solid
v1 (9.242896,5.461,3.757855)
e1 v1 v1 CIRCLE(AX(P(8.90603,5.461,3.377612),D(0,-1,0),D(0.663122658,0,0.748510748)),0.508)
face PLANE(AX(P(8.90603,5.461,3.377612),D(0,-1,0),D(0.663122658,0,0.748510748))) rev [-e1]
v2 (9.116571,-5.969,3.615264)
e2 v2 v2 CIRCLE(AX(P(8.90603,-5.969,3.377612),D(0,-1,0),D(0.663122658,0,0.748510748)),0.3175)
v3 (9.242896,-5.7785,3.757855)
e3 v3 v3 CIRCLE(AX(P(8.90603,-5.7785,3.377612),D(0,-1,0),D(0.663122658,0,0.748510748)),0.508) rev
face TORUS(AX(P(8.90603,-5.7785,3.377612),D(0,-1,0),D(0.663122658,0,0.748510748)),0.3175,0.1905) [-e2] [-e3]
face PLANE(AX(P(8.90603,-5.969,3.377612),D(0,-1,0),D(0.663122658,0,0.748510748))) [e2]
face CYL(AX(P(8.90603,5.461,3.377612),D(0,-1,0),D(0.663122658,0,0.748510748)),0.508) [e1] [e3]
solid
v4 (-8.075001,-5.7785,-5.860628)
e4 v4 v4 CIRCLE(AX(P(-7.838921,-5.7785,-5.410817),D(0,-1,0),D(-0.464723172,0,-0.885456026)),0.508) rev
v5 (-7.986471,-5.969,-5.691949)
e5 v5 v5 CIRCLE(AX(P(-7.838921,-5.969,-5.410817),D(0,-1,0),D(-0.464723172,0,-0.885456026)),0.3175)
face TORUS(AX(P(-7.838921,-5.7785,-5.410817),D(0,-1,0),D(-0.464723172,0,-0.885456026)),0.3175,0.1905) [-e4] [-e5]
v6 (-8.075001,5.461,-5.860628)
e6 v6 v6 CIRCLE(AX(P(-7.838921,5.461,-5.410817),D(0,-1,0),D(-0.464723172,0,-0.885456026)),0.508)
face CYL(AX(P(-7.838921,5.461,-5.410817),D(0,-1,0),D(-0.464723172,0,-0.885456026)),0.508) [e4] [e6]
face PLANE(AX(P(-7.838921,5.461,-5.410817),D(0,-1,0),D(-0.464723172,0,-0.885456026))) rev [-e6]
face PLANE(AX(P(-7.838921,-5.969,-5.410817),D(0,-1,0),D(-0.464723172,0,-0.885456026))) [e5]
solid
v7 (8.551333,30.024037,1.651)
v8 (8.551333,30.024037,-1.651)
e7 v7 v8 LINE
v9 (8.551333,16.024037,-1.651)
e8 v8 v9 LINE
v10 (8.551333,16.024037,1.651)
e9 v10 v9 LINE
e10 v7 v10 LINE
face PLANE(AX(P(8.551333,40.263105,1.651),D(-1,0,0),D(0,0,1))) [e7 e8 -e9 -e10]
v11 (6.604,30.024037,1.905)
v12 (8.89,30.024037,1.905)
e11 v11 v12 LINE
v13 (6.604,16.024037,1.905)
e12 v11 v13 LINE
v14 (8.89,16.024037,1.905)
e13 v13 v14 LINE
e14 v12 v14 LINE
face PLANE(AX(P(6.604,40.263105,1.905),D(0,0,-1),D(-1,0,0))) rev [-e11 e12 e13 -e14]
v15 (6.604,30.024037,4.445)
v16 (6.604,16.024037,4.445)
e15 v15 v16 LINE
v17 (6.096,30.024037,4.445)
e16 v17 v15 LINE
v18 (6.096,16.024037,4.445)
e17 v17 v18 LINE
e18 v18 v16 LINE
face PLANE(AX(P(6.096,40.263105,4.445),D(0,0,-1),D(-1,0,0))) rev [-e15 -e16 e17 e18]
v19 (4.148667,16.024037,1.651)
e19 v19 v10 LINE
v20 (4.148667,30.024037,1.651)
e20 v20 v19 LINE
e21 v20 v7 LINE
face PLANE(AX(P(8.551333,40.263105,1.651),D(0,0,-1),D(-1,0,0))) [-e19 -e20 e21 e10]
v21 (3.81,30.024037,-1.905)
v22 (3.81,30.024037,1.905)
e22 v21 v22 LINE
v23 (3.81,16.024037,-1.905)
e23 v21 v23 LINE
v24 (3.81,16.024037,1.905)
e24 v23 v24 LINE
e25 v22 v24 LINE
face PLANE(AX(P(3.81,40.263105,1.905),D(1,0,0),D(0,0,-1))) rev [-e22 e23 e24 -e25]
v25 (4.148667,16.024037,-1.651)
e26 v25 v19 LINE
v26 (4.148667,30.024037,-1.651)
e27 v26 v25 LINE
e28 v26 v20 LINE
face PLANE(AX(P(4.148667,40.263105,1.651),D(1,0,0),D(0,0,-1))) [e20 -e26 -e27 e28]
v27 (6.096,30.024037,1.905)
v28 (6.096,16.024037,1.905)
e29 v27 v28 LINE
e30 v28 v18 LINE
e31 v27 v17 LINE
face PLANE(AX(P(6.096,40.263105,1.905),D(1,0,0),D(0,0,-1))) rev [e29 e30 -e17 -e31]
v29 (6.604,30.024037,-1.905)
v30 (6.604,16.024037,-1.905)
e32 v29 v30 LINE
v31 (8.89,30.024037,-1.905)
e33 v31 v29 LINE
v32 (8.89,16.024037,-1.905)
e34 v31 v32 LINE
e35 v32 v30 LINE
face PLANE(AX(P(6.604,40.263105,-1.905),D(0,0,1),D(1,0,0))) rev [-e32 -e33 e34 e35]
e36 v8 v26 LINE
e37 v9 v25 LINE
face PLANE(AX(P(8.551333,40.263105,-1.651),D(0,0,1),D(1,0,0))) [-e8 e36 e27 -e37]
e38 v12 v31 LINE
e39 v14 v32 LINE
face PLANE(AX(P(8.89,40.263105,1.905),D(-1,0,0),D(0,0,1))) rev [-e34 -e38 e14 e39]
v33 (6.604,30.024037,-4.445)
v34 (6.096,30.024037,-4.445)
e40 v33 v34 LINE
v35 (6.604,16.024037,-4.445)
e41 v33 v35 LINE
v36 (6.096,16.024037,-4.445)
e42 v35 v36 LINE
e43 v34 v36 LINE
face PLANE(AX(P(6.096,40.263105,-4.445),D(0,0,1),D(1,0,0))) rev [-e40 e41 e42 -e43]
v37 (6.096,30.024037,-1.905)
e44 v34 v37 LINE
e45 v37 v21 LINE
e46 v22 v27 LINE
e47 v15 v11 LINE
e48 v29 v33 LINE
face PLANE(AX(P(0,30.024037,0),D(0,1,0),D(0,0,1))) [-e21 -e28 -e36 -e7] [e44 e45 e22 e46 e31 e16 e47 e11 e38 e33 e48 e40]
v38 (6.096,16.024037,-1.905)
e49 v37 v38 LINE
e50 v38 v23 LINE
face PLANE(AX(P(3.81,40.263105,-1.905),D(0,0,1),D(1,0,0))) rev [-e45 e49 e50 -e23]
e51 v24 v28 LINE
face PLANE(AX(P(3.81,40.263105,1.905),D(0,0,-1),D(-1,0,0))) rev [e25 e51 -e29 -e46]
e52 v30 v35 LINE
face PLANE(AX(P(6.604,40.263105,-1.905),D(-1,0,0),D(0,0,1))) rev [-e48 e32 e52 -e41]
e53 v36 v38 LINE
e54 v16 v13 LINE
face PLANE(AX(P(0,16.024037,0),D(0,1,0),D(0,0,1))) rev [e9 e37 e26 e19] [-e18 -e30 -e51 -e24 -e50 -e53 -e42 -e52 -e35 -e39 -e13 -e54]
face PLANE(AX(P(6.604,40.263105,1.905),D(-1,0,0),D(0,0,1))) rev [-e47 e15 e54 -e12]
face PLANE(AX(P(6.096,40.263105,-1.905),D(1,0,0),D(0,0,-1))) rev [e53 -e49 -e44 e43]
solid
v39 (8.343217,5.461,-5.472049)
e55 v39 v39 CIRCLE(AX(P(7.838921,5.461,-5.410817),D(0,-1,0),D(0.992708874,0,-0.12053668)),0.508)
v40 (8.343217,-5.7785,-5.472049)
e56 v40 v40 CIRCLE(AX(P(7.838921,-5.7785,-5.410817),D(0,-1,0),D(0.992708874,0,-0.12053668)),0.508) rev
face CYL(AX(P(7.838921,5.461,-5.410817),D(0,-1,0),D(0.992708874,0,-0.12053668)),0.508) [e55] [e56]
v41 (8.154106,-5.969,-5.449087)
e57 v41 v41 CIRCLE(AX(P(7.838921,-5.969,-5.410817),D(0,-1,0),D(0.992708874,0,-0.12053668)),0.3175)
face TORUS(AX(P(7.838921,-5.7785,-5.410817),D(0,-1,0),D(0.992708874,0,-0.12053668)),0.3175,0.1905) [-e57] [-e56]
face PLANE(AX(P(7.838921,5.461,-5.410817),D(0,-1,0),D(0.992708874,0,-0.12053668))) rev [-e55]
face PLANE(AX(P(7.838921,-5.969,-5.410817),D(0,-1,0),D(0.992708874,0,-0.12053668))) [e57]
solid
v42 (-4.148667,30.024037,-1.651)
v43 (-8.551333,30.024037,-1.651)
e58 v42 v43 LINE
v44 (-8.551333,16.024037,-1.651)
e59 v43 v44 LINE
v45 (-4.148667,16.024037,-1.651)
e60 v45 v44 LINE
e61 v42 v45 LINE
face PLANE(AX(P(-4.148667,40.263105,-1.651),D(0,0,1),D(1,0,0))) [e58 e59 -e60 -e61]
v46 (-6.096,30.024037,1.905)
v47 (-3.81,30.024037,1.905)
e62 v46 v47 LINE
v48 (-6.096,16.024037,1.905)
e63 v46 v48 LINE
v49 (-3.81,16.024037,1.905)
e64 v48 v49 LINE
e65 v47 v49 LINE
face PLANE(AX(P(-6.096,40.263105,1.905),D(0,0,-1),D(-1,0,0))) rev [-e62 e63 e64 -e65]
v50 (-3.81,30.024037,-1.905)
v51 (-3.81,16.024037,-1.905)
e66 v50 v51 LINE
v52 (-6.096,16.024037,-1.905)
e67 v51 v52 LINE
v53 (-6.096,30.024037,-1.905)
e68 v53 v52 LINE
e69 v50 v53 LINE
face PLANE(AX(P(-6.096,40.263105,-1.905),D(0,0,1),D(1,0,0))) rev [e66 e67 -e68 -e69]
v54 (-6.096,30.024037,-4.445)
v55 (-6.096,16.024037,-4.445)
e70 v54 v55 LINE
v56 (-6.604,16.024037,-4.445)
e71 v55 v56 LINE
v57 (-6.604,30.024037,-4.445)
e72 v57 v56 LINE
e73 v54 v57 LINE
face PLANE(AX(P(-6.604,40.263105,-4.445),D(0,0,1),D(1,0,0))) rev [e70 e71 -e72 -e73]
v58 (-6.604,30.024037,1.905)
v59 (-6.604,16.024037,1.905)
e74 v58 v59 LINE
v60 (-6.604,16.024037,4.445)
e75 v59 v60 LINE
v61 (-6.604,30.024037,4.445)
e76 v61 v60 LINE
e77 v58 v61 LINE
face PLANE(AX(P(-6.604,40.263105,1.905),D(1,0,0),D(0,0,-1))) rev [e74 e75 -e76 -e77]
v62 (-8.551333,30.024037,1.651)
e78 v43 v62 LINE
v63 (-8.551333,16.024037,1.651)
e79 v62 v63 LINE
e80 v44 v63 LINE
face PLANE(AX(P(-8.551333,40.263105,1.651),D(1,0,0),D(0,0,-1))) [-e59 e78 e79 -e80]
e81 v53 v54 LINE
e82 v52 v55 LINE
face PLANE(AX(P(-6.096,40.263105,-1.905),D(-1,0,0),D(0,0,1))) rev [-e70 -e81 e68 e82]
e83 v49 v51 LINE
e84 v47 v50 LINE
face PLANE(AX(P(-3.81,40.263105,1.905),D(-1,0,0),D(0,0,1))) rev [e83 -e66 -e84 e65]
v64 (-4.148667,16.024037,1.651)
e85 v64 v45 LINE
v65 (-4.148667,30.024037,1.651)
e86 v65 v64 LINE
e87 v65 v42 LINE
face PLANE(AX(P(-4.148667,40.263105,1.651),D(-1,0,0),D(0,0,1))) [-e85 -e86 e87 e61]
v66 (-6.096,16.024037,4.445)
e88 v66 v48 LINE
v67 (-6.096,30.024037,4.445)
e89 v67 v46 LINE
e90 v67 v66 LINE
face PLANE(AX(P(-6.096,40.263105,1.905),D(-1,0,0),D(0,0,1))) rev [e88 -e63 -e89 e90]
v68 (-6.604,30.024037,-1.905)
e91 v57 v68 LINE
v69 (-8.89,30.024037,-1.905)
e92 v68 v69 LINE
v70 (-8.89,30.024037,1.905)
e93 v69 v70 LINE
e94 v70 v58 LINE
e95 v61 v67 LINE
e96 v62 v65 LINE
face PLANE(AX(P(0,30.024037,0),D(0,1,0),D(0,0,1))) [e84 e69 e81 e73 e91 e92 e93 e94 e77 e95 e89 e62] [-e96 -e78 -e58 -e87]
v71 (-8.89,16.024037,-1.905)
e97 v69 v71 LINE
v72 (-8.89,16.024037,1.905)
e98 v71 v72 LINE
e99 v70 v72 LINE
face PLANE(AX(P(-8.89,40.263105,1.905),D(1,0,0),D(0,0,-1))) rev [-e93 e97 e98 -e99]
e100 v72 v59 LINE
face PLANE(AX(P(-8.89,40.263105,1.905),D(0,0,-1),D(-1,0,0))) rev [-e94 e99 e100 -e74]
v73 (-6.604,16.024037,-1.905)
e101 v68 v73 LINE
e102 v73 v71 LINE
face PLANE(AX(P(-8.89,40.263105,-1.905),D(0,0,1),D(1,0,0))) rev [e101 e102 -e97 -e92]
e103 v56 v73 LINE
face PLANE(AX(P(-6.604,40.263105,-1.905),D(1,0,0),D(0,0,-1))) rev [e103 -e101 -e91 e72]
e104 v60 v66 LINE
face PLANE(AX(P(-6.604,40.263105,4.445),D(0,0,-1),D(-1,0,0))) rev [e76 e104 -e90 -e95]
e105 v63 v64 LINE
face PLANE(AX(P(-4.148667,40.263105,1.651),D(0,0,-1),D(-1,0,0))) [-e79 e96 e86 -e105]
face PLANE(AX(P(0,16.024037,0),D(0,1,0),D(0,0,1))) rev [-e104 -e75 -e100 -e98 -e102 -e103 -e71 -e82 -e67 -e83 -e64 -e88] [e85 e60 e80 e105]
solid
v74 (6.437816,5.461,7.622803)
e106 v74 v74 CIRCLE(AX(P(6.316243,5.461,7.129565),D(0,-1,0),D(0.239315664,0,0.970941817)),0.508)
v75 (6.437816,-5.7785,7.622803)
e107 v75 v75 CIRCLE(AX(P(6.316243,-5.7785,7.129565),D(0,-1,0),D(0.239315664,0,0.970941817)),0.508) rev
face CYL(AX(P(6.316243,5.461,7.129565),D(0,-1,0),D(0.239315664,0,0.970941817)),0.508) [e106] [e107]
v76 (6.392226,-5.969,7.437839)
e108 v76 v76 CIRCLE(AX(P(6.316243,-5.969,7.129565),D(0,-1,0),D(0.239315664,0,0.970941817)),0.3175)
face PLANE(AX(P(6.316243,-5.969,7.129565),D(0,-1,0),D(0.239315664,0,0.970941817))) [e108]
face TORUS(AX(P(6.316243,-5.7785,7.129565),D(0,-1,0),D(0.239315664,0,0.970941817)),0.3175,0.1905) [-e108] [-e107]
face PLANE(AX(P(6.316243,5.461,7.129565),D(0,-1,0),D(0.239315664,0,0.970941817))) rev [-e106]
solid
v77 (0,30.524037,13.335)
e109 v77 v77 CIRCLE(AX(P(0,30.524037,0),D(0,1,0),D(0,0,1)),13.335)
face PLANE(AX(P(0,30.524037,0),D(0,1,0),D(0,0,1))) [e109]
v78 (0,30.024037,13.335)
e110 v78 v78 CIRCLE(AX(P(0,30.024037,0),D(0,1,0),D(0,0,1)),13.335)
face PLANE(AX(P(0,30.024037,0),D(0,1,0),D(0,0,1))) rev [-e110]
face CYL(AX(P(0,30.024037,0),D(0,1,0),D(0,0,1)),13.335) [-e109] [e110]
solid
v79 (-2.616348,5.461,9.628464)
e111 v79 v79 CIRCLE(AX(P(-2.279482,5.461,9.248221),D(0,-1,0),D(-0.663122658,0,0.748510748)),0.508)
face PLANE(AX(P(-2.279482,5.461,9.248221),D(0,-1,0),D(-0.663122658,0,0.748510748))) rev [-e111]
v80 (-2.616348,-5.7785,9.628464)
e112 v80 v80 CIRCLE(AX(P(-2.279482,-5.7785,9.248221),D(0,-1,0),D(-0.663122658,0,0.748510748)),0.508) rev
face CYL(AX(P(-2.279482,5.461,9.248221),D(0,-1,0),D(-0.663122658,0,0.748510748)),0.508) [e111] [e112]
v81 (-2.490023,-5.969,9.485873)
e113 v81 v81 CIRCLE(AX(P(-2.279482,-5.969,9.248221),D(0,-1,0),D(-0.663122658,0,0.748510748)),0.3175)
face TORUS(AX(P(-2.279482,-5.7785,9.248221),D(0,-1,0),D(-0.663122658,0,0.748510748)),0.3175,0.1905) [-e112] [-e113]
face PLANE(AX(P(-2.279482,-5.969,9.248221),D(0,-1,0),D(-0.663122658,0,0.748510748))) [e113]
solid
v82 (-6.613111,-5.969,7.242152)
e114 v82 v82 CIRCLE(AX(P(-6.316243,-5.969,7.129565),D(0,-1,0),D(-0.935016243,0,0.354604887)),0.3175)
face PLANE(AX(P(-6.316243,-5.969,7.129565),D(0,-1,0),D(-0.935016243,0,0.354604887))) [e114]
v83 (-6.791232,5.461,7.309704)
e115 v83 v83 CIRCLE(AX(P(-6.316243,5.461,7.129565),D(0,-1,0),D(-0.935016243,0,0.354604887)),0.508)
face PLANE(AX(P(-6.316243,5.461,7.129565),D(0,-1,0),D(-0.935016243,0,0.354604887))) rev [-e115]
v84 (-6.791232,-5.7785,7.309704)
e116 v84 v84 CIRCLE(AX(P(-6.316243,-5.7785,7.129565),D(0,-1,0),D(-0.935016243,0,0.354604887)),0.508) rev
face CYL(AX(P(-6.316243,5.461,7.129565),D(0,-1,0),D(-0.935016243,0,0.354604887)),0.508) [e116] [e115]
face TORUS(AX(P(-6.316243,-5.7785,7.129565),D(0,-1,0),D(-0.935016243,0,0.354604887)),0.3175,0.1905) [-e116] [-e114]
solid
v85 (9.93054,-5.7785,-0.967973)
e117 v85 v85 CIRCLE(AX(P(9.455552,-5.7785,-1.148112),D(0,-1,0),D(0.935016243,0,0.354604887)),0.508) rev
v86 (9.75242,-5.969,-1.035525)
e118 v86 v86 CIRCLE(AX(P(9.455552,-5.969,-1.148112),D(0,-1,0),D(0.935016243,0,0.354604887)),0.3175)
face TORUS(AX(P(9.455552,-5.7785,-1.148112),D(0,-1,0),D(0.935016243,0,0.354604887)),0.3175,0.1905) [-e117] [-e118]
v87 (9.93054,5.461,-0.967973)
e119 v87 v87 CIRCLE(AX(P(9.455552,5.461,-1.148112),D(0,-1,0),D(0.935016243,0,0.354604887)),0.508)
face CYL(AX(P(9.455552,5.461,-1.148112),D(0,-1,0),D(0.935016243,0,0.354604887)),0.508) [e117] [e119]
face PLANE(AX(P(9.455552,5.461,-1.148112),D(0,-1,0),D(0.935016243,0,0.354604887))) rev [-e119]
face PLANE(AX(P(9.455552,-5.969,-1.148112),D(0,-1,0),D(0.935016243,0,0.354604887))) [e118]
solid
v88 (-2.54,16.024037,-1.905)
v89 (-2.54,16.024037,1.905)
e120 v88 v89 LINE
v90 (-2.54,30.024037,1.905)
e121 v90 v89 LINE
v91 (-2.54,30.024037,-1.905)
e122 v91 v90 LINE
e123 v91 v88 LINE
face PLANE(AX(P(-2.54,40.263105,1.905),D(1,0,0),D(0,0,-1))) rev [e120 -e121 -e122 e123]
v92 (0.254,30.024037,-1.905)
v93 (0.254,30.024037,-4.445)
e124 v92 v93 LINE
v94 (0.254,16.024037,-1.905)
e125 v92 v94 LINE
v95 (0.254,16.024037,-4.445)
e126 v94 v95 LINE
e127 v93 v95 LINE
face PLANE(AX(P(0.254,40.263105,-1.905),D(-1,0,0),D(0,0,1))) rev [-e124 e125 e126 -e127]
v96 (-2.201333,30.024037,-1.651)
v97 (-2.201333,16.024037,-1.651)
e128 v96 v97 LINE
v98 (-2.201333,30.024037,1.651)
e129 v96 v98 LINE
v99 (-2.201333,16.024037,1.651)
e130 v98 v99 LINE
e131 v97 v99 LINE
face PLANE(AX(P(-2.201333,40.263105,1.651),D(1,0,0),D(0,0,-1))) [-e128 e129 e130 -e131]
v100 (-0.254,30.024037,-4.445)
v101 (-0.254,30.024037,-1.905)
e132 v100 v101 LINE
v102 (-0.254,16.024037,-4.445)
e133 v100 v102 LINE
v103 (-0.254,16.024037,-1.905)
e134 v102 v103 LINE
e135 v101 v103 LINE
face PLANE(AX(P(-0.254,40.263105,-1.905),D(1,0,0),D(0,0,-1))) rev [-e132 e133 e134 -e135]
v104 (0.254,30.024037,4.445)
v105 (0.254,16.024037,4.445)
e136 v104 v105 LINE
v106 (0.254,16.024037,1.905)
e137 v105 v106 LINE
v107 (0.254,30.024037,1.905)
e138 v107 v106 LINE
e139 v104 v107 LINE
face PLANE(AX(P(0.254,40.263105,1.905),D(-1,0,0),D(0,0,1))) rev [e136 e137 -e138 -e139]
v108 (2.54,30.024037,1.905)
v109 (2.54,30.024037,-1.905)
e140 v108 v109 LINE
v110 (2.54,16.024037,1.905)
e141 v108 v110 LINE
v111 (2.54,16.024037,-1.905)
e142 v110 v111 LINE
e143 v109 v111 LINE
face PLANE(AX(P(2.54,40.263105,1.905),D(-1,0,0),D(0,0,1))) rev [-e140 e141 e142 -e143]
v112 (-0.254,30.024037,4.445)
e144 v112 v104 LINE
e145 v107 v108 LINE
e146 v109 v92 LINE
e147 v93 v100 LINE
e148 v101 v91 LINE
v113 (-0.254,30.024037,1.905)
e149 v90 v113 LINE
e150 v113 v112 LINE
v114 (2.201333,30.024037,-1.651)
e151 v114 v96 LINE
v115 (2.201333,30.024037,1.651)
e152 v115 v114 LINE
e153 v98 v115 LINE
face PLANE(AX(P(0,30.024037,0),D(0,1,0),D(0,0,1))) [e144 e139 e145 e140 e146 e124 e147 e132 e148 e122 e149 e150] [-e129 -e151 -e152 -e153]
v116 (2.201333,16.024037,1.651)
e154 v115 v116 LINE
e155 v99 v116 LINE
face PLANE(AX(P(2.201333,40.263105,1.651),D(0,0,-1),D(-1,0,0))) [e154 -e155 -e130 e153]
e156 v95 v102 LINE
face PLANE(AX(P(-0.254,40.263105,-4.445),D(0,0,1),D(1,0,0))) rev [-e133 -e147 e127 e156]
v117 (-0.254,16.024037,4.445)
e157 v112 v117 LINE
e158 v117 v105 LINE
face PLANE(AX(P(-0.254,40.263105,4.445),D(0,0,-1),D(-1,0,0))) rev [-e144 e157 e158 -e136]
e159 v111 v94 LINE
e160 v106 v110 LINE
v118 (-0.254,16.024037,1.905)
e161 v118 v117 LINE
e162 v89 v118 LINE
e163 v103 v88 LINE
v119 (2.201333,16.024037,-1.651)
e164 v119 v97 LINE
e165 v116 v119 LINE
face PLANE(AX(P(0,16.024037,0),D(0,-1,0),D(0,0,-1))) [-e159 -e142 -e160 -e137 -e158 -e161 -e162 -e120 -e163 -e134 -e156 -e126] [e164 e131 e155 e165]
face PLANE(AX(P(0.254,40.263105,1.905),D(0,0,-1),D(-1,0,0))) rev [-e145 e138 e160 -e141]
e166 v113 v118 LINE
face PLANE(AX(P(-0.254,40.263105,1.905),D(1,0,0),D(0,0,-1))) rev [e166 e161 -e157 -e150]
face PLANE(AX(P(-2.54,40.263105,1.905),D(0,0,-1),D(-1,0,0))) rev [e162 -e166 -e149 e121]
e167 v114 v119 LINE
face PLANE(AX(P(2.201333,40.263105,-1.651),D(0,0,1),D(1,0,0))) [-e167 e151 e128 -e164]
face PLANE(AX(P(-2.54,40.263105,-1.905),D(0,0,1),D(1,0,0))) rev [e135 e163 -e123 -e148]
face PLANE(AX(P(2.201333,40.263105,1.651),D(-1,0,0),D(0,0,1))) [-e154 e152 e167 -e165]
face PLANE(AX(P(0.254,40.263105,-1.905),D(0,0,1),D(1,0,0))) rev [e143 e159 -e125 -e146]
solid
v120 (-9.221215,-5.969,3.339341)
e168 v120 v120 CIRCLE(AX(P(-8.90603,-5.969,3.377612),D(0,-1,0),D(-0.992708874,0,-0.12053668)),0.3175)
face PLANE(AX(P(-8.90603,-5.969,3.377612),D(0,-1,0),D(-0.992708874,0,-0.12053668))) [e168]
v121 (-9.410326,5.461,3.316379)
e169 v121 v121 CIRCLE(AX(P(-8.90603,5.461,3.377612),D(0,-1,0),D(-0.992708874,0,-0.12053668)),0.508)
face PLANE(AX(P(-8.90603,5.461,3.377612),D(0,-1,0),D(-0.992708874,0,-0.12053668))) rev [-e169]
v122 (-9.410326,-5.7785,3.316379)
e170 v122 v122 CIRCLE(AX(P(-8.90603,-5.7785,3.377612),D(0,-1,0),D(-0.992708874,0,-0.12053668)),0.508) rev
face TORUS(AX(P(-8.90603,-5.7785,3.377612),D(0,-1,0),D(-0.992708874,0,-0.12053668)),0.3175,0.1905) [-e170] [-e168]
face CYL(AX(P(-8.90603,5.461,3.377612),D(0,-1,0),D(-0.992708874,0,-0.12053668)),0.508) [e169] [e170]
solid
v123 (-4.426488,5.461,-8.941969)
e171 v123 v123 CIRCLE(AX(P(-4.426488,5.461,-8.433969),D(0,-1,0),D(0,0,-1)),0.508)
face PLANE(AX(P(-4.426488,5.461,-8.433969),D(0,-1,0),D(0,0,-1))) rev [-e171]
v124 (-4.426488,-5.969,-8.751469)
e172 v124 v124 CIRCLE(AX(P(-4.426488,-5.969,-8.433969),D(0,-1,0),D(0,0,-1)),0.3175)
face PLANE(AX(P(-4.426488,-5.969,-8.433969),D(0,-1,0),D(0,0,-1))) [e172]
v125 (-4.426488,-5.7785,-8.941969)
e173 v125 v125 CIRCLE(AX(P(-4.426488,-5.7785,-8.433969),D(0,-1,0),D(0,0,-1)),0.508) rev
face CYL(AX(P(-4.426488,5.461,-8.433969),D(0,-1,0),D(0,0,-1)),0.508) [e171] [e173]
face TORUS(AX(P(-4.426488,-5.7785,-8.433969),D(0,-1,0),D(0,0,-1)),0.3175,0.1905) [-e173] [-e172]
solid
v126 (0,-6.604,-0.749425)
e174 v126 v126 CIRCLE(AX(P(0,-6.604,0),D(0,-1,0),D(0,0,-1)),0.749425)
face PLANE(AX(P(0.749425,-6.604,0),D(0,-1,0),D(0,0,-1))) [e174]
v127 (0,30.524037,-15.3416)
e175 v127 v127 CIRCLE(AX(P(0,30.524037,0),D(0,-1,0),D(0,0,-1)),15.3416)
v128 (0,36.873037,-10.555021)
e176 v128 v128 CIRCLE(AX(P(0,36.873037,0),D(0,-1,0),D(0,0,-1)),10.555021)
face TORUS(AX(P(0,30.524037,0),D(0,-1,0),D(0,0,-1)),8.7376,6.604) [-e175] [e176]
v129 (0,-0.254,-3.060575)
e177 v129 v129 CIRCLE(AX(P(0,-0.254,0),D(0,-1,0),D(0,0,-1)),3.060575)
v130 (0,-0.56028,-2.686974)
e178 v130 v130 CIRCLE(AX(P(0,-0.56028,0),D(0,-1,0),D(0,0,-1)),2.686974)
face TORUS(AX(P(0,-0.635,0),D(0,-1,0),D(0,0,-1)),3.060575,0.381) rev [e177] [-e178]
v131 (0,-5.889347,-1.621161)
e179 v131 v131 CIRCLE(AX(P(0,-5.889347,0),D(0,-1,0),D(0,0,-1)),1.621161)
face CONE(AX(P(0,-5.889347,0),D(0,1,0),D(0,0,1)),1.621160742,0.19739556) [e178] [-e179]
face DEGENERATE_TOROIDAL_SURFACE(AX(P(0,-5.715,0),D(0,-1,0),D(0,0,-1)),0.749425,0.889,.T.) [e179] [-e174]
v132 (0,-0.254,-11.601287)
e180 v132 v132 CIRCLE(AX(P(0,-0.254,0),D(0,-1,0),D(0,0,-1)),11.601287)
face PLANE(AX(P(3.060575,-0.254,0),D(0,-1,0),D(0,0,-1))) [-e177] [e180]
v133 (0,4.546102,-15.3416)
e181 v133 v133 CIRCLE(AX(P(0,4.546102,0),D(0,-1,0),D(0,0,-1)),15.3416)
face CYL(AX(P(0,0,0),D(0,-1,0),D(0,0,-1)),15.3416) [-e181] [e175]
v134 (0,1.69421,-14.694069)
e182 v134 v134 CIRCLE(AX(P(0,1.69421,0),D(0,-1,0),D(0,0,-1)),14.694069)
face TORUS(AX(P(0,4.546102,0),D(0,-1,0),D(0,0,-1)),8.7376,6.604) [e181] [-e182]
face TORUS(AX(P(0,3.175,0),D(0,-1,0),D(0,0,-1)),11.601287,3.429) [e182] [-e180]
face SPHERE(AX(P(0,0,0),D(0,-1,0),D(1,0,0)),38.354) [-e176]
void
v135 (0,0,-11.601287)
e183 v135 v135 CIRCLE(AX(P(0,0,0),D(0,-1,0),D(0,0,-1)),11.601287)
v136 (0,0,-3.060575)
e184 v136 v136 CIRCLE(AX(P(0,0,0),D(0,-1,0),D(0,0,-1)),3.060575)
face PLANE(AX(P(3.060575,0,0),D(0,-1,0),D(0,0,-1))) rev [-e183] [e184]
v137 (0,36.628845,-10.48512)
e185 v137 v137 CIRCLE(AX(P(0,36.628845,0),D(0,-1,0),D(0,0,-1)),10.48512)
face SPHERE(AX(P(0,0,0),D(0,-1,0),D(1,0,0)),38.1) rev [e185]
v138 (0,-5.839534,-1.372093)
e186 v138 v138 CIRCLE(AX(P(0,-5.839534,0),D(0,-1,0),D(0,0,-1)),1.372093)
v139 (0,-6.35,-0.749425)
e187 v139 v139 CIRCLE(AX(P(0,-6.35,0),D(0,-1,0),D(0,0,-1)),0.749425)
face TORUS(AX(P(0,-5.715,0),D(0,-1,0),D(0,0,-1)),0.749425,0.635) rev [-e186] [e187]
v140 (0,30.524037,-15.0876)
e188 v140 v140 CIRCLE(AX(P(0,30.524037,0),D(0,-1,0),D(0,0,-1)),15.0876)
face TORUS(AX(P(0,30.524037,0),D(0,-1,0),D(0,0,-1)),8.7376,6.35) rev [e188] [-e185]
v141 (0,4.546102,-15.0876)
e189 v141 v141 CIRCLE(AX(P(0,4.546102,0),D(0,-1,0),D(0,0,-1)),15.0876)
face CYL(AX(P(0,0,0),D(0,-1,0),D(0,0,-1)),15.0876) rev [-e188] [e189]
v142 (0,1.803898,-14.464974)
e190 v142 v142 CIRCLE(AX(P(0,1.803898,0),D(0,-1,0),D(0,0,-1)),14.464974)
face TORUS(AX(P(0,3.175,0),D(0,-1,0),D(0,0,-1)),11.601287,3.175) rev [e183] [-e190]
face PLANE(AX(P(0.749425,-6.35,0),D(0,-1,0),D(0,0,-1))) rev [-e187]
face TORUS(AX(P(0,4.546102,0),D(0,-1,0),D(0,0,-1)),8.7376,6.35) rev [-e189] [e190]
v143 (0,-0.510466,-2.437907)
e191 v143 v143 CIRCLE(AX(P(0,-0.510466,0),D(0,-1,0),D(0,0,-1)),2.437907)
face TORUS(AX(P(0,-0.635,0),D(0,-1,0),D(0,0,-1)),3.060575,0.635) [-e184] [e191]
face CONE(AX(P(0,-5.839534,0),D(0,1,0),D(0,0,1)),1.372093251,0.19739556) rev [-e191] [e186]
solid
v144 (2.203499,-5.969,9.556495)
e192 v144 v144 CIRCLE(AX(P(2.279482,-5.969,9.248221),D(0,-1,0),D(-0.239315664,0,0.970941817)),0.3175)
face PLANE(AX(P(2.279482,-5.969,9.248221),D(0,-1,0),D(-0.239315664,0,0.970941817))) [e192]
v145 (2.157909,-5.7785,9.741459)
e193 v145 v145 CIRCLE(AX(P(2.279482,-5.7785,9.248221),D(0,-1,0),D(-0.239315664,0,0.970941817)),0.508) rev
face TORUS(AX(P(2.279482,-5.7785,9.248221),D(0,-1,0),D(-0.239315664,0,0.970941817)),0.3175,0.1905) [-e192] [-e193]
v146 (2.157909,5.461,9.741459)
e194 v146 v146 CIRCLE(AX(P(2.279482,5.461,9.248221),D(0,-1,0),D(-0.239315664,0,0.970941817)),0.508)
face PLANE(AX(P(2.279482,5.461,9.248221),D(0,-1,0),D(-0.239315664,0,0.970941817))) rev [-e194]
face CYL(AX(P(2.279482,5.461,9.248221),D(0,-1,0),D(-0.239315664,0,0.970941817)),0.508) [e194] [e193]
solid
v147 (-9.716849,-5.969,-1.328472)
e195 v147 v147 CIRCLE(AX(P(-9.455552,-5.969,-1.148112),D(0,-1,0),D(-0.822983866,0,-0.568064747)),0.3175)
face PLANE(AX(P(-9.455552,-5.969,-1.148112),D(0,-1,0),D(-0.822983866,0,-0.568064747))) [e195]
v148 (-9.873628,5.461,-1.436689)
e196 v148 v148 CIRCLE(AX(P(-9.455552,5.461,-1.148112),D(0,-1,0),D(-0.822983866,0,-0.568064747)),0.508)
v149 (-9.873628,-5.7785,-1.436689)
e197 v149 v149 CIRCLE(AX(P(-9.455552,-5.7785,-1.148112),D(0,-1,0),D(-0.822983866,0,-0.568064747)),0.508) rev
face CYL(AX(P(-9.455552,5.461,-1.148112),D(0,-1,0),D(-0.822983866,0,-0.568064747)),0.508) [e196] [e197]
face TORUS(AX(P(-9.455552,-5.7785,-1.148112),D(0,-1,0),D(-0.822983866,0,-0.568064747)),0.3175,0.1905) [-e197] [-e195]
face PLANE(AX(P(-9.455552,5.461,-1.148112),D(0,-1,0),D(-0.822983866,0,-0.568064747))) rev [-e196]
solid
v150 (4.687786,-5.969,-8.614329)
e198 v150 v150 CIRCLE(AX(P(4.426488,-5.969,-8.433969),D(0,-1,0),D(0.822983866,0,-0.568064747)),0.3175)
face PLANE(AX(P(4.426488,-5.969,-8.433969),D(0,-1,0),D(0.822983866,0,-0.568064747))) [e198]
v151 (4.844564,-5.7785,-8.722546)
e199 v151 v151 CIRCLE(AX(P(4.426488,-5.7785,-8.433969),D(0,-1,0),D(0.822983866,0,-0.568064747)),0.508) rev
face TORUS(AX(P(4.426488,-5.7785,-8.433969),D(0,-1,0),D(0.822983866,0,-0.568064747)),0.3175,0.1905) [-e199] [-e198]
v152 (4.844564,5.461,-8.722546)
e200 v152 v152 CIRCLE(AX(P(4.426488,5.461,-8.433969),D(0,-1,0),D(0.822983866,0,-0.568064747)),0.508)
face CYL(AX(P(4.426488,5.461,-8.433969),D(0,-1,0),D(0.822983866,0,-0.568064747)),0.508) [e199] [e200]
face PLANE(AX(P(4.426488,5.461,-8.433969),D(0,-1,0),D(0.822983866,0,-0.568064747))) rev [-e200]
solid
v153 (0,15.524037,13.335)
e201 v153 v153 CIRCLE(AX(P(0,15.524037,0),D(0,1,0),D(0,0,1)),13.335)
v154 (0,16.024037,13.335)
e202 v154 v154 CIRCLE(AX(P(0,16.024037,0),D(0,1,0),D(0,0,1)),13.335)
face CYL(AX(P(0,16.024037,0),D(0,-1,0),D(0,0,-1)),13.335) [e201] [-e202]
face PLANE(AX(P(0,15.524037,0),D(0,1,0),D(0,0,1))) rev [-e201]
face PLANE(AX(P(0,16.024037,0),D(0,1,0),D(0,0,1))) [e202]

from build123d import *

# Parameters (mm, degrees)
BOSS_EXTRUDE2_START     = -5.969
BOSS_EXTRUDE2_OUTLINE_R = 0.508
BOSS_EXTRUDE2_DEPTH     = 11.43
FILLET2_R               = 0.1905
SKETCH4_R               = 13.335
BOSS_EXTRUDE3_DEPTH     = 0.5
SKETCH5_R               = 13.335
BOSS_EXTRUDE4_DEPTH     = 0.5
SKETCH6_W               = 4.402666666
SKETCH6_H               = 3.302
BOSS_EXTRUDE5_DEPTH     = 14
BOSS_EXTRUDE5_2_DEPTH   = 14
BOSS_EXTRUDE5_3_DEPTH   = 14


# Read off the part's stored shape, not the designer's step: Boss-Extrude2, CirPattern5
with BuildPart() as part:
    # Sketch1 → Revolve-Thin1 (revolve)
    with BuildSketch(Plane.XY, mode=Mode.PRIVATE) as revolve_thin1_sk:
        with BuildLine():
            ThreePointArc((0, 38.1), (5.293912531, 37.730418632), (10.48512, 36.628844625))
            ThreePointArc((10.48512, 36.628844625), (13.808066054, 34.346716091), (15.0876, 30.524037188))
            Line((15.0876, 30.524037188), (15.0876, 4.546102091))
            ThreePointArc((15.0876, 4.546102091), (14.929987533, 3.140101864), (14.464974287, 1.803897909))
            ThreePointArc((14.464974287, 1.803897909), (13.293530604, 0.488564244), (11.601287143, 0))
            Line((11.601287143, 0), (3.060575478, 0))
            ThreePointArc((3.060575478, 0), (2.657992523, -0.14392774), (2.437906749, -0.510466254))
            Line((2.437906749, -0.510466254), (1.372093251, -5.839533746))
            ThreePointArc((1.372093251, -5.839533746), (1.152007477, -6.20607226), (0.749424522, -6.35))
            Line((0.749424522, -6.35), (0, -6.35))
            Line((0, -6.35), (0, -6.604))
            Line((0, -6.604), (0.749424522, -6.604))
            ThreePointArc((0.749424522, -6.604), (1.313040659, -6.402501164), (1.621160742, -5.889347244))
            Line((1.621160742, -5.889347244), (2.686974241, -0.560279753))
            ThreePointArc((2.686974241, -0.560279753), (2.819025705, -0.340356644), (3.060575478, -0.254))
            Line((3.060575478, -0.254), (11.601287143, -0.254))
            ThreePointArc((11.601287143, -0.254), (13.428910081, 0.273649384), (14.694069258, 1.694209741))
            ThreePointArc((14.694069258, 1.694209741), (15.177683034, 3.083861855), (15.3416, 4.546102091))
            Line((15.3416, 4.546102091), (15.3416, 30.524037188))
            ThreePointArc((15.3416, 30.524037188), (14.010884696, 34.499623248), (10.5550208, 36.873036923))
            ThreePointArc((10.5550208, 36.873036923), (5.329205281, 37.981954756), (0, 38.354))
            Line((0, 38.354), (0, 38.1))
        make_face()
    revolve(revolve_thin1_sk.sketch.rotate(Axis((0, 0, 0), (0, 1, 0)), 90), axis=Axis((0, 0, 0), (0, 1, 0)))


with BuildPart() as body_2:
    # Boss-Extrude2 outline → Boss-Extrude2 (new body)
    with BuildSketch(Plane(origin=(0, 0, 0), x_dir=(1, 0, 0), z_dir=(0, 1, 0)).offset(BOSS_EXTRUDE2_START)):
        with Locations((-4.426488214, 8.433968644)):
            Circle(BOSS_EXTRUDE2_OUTLINE_R)
    extrude(amount=BOSS_EXTRUDE2_DEPTH)

    # Fillet2
    fillet2_edges = [body_2.edges().sort_by_distance(p)[0] for p in [
        (-4.934488214, -5.969, -8.433968644),
    ]]
    fillet(fillet2_edges, radius=FILLET2_R)


with BuildPart() as body_3:
    # CirPattern5 outline → CirPattern5 (revolve)
    with BuildSketch(Plane(origin=(4.426488214, 0, -8.433968644), x_dir=(1, 0, 0), z_dir=(0, 0, 1))):
        with BuildLine():
            Line((0.508, -5.7785), (0.508, 5.461))
            Line((0.508, 5.461), (0, 5.461))
            Line((0, 5.461), (0, -5.969))
            Line((0, -5.969), (0.3175, -5.969))
            ThreePointArc((0.3175, -5.969), (0.452203842, -5.913203842), (0.508, -5.7785))
        make_face()
    revolve(axis=Axis((4.426488214, 0, -8.433968644), (0, 1, 0)))


with BuildPart() as body_4:
    # CirPattern5 2 outline → CirPattern5 2 (revolve)
    with BuildSketch(Plane(origin=(7.838921323, 0, -5.410816713), x_dir=(1, 0, 0), z_dir=(0, 0, 1))):
        with BuildLine():
            Line((0.508, 5.461), (0, 5.461))
            Line((0, 5.461), (0, -5.969))
            Line((0, -5.969), (0.3175, -5.969))
            ThreePointArc((0.3175, -5.969), (0.452203842, -5.913203842), (0.508, -5.7785))
            Line((0.508, -5.7785), (0.508, 5.461))
        make_face()
    revolve(axis=Axis((7.838921323, 0, -5.410816713), (0, 1, 0)))


with BuildPart() as body_5:
    # CirPattern5 3 outline → CirPattern5 3 (revolve)
    with BuildSketch(Plane(origin=(9.455552026, 0, -1.148111879), x_dir=(1, 0, 0), z_dir=(0, 0, 1))):
        with BuildLine():
            Line((0.508, 5.461), (0, 5.461))
            Line((0, 5.461), (0, -5.969))
            Line((0, -5.969), (0.3175, -5.969))
            ThreePointArc((0.3175, -5.969), (0.452203842, -5.913203842), (0.508, -5.7785))
            Line((0.508, -5.7785), (0.508, 5.461))
        make_face()
    revolve(axis=Axis((9.455552026, 0, -1.148111879), (0, 1, 0)))


with BuildPart() as body_6:
    # CirPattern5 4 outline → CirPattern5 4 (revolve)
    with BuildSketch(Plane(origin=(8.906029712, 0, 3.377611549), x_dir=(1, 0, 0), z_dir=(0, 0, 1))):
        with BuildLine():
            Line((0.508, 5.461), (0, 5.461))
            Line((0, 5.461), (0, -5.969))
            Line((0, -5.969), (0.3175, -5.969))
            ThreePointArc((0.3175, -5.969), (0.452203842, -5.913203842), (0.508, -5.7785))
            Line((0.508, -5.7785), (0.508, 5.461))
        make_face()
    revolve(axis=Axis((8.906029712, 0, 3.377611549), (0, 1, 0)))


with BuildPart() as body_7:
    # CirPattern5 5 outline → CirPattern5 5 (revolve)
    with BuildSketch(Plane(origin=(6.31624332, 0, 7.129564876), x_dir=(1, 0, 0), z_dir=(0, 0, 1))):
        with BuildLine():
            Line((0.508, 5.461), (0, 5.461))
            Line((0, 5.461), (0, -5.969))
            Line((0, -5.969), (0.3175, -5.969))
            ThreePointArc((0.3175, -5.969), (0.452203842, -5.913203842), (0.508, -5.7785))
            Line((0.508, -5.7785), (0.508, 5.461))
        make_face()
    revolve(axis=Axis((6.31624332, 0, 7.129564876), (0, 1, 0)))


with BuildPart() as body_8:
    # CirPattern5 6 outline → CirPattern5 6 (revolve)
    with BuildSketch(Plane(origin=(2.279481702, 0, 9.248220811), x_dir=(1, 0, 0), z_dir=(0, 0, 1))):
        with BuildLine():
            Line((0.508, 5.461), (0, 5.461))
            Line((0, 5.461), (0, -5.969))
            Line((0, -5.969), (0.3175, -5.969))
            ThreePointArc((0.3175, -5.969), (0.452203842, -5.913203842), (0.508, -5.7785))
            Line((0.508, -5.7785), (0.508, 5.461))
        make_face()
    revolve(axis=Axis((2.279481702, 0, 9.248220811), (0, 1, 0)))


with BuildPart() as body_9:
    # CirPattern5 7 outline → CirPattern5 7 (revolve)
    with BuildSketch(Plane(origin=(-2.279481702, 0, 9.248220811), x_dir=(1, 0, 0), z_dir=(0, 0, 1))):
        with BuildLine():
            Line((0.508, 5.461), (0, 5.461))
            Line((0, 5.461), (0, -5.969))
            Line((0, -5.969), (0.3175, -5.969))
            ThreePointArc((0.3175, -5.969), (0.452203842, -5.913203842), (0.508, -5.7785))
            Line((0.508, -5.7785), (0.508, 5.461))
        make_face()
    revolve(axis=Axis((-2.279481702, 0, 9.248220811), (0, 1, 0)))


with BuildPart() as body_10:
    # CirPattern5 8 outline → CirPattern5 8 (revolve)
    with BuildSketch(Plane(origin=(-6.31624332, 0, 7.129564876), x_dir=(1, 0, 0), z_dir=(0, 0, 1))):
        with BuildLine():
            Line((0.508, 5.461), (0, 5.461))
            Line((0, 5.461), (0, -5.969))
            Line((0, -5.969), (0.3175, -5.969))
            ThreePointArc((0.3175, -5.969), (0.452203842, -5.913203842), (0.508, -5.7785))
            Line((0.508, -5.7785), (0.508, 5.461))
        make_face()
    revolve(axis=Axis((-6.31624332, 0, 7.129564876), (0, 1, 0)))


with BuildPart() as body_11:
    # CirPattern5 9 outline → CirPattern5 9 (revolve)
    with BuildSketch(Plane(origin=(-8.906029712, 0, 3.377611549), x_dir=(1, 0, 0), z_dir=(0, 0, 1))):
        with BuildLine():
            Line((0.508, 5.461), (0, 5.461))
            Line((0, 5.461), (0, -5.969))
            Line((0, -5.969), (0.3175, -5.969))
            ThreePointArc((0.3175, -5.969), (0.452203842, -5.913203842), (0.508, -5.7785))
            Line((0.508, -5.7785), (0.508, 5.461))
        make_face()
    revolve(axis=Axis((-8.906029712, 0, 3.377611549), (0, 1, 0)))


with BuildPart() as body_12:
    # CirPattern5 10 outline → CirPattern5 10 (revolve)
    with BuildSketch(Plane(origin=(-9.455552026, 0, -1.148111879), x_dir=(1, 0, 0), z_dir=(0, 0, 1))):
        with BuildLine():
            Line((0.508, 5.461), (0, 5.461))
            Line((0, 5.461), (0, -5.969))
            Line((0, -5.969), (0.3175, -5.969))
            ThreePointArc((0.3175, -5.969), (0.452203842, -5.913203842), (0.508, -5.7785))
            Line((0.508, -5.7785), (0.508, 5.461))
        make_face()
    revolve(axis=Axis((-9.455552026, 0, -1.148111879), (0, 1, 0)))


with BuildPart() as body_13:
    # CirPattern5 11 outline → CirPattern5 11 (revolve)
    with BuildSketch(Plane(origin=(-7.838921323, 0, -5.410816713), x_dir=(1, 0, 0), z_dir=(0, 0, 1))):
        with BuildLine():
            Line((0.508, 5.461), (0, 5.461))
            Line((0, 5.461), (0, -5.969))
            Line((0, -5.969), (0.3175, -5.969))
            ThreePointArc((0.3175, -5.969), (0.452203842, -5.913203842), (0.508, -5.7785))
            Line((0.508, -5.7785), (0.508, 5.461))
        make_face()
    revolve(axis=Axis((-7.838921323, 0, -5.410816713), (0, 1, 0)))


with BuildPart() as body_14:
    # Sketch4 → Boss-Extrude3 (new body)
    with BuildSketch(Plane(origin=(0, 15.524037188, 0), x_dir=(1, 0, 0), z_dir=(0, 1, 0))):
        with Locations(Location((0, 0, 0), (0, 0, 270))):
            Circle(SKETCH4_R)
    extrude(amount=BOSS_EXTRUDE3_DEPTH)


with BuildPart() as body_15:
    # Sketch5 → Boss-Extrude4 (new body)
    with BuildSketch(Plane(origin=(0, 30.524037188, 0), x_dir=(1, 0, 0), z_dir=(0, 1, 0))):
        with Locations(Location((0, 0, 0), (0, 0, 270))):
            Circle(SKETCH5_R)
    extrude(amount=-BOSS_EXTRUDE4_DEPTH)


with BuildPart() as body_16:
    # Sketch6 → Boss-Extrude5 (new body)
    with BuildSketch(Plane(origin=(0, 16.024037188, 0), x_dir=(1, 0, 0), z_dir=(0, 1, 0))):
        Polygon((0.254, 1.905), (2.54, 1.905), (2.54, -1.905), (0.254, -1.905), (0.254, -4.445), (-0.254, -4.445), (-0.254, -1.905), (-2.54, -1.905), (-2.54, 1.905), (-0.254, 1.905), (-0.254, 4.445), (0.254, 4.445), align=None)
        Rectangle(SKETCH6_W, SKETCH6_H, mode=Mode.SUBTRACT)
    extrude(amount=BOSS_EXTRUDE5_DEPTH)


with BuildPart() as body_17:
    # Sketch6 → Boss-Extrude5 2 (new body)
    with BuildSketch(Plane(origin=(0, 16.024037188, 0), x_dir=(1, 0, 0), z_dir=(0, 1, 0))):
        Polygon((3.81, 1.905), (6.096, 1.905), (6.096, 4.445), (6.604, 4.445), (6.604, 1.905), (8.89, 1.905), (8.89, -1.905), (6.604, -1.905), (6.604, -4.445), (6.096, -4.445), (6.096, -1.905), (3.81, -1.905), align=None)
        with Locations((6.35, 0)):
            Rectangle(SKETCH6_W, SKETCH6_H, mode=Mode.SUBTRACT)
    extrude(amount=BOSS_EXTRUDE5_2_DEPTH)


with BuildPart() as body_18:
    # Sketch6 → Boss-Extrude5 3 (new body)
    with BuildSketch(Plane(origin=(0, 16.024037188, 0), x_dir=(1, 0, 0), z_dir=(0, 1, 0))):
        Polygon((-8.89, 1.905), (-6.604, 1.905), (-6.604, 4.445), (-6.096, 4.445), (-6.096, 1.905), (-3.81, 1.905), (-3.81, -1.905), (-6.096, -1.905), (-6.096, -4.445), (-6.604, -4.445), (-6.604, -1.905), (-8.89, -1.905), align=None)
        with Locations((-6.35, 0)):
            Rectangle(SKETCH6_W, SKETCH6_H, mode=Mode.SUBTRACT)
    extrude(amount=BOSS_EXTRUDE5_3_DEPTH)


solid = Compound([part.part, body_2.part, body_3.part, body_4.part, body_5.part, body_6.part, body_7.part, body_8.part, body_9.part, body_10.part, body_11.part, body_12.part, body_13.part, body_14.part, body_15.part, body_16.part, body_17.part, body_18.part])
